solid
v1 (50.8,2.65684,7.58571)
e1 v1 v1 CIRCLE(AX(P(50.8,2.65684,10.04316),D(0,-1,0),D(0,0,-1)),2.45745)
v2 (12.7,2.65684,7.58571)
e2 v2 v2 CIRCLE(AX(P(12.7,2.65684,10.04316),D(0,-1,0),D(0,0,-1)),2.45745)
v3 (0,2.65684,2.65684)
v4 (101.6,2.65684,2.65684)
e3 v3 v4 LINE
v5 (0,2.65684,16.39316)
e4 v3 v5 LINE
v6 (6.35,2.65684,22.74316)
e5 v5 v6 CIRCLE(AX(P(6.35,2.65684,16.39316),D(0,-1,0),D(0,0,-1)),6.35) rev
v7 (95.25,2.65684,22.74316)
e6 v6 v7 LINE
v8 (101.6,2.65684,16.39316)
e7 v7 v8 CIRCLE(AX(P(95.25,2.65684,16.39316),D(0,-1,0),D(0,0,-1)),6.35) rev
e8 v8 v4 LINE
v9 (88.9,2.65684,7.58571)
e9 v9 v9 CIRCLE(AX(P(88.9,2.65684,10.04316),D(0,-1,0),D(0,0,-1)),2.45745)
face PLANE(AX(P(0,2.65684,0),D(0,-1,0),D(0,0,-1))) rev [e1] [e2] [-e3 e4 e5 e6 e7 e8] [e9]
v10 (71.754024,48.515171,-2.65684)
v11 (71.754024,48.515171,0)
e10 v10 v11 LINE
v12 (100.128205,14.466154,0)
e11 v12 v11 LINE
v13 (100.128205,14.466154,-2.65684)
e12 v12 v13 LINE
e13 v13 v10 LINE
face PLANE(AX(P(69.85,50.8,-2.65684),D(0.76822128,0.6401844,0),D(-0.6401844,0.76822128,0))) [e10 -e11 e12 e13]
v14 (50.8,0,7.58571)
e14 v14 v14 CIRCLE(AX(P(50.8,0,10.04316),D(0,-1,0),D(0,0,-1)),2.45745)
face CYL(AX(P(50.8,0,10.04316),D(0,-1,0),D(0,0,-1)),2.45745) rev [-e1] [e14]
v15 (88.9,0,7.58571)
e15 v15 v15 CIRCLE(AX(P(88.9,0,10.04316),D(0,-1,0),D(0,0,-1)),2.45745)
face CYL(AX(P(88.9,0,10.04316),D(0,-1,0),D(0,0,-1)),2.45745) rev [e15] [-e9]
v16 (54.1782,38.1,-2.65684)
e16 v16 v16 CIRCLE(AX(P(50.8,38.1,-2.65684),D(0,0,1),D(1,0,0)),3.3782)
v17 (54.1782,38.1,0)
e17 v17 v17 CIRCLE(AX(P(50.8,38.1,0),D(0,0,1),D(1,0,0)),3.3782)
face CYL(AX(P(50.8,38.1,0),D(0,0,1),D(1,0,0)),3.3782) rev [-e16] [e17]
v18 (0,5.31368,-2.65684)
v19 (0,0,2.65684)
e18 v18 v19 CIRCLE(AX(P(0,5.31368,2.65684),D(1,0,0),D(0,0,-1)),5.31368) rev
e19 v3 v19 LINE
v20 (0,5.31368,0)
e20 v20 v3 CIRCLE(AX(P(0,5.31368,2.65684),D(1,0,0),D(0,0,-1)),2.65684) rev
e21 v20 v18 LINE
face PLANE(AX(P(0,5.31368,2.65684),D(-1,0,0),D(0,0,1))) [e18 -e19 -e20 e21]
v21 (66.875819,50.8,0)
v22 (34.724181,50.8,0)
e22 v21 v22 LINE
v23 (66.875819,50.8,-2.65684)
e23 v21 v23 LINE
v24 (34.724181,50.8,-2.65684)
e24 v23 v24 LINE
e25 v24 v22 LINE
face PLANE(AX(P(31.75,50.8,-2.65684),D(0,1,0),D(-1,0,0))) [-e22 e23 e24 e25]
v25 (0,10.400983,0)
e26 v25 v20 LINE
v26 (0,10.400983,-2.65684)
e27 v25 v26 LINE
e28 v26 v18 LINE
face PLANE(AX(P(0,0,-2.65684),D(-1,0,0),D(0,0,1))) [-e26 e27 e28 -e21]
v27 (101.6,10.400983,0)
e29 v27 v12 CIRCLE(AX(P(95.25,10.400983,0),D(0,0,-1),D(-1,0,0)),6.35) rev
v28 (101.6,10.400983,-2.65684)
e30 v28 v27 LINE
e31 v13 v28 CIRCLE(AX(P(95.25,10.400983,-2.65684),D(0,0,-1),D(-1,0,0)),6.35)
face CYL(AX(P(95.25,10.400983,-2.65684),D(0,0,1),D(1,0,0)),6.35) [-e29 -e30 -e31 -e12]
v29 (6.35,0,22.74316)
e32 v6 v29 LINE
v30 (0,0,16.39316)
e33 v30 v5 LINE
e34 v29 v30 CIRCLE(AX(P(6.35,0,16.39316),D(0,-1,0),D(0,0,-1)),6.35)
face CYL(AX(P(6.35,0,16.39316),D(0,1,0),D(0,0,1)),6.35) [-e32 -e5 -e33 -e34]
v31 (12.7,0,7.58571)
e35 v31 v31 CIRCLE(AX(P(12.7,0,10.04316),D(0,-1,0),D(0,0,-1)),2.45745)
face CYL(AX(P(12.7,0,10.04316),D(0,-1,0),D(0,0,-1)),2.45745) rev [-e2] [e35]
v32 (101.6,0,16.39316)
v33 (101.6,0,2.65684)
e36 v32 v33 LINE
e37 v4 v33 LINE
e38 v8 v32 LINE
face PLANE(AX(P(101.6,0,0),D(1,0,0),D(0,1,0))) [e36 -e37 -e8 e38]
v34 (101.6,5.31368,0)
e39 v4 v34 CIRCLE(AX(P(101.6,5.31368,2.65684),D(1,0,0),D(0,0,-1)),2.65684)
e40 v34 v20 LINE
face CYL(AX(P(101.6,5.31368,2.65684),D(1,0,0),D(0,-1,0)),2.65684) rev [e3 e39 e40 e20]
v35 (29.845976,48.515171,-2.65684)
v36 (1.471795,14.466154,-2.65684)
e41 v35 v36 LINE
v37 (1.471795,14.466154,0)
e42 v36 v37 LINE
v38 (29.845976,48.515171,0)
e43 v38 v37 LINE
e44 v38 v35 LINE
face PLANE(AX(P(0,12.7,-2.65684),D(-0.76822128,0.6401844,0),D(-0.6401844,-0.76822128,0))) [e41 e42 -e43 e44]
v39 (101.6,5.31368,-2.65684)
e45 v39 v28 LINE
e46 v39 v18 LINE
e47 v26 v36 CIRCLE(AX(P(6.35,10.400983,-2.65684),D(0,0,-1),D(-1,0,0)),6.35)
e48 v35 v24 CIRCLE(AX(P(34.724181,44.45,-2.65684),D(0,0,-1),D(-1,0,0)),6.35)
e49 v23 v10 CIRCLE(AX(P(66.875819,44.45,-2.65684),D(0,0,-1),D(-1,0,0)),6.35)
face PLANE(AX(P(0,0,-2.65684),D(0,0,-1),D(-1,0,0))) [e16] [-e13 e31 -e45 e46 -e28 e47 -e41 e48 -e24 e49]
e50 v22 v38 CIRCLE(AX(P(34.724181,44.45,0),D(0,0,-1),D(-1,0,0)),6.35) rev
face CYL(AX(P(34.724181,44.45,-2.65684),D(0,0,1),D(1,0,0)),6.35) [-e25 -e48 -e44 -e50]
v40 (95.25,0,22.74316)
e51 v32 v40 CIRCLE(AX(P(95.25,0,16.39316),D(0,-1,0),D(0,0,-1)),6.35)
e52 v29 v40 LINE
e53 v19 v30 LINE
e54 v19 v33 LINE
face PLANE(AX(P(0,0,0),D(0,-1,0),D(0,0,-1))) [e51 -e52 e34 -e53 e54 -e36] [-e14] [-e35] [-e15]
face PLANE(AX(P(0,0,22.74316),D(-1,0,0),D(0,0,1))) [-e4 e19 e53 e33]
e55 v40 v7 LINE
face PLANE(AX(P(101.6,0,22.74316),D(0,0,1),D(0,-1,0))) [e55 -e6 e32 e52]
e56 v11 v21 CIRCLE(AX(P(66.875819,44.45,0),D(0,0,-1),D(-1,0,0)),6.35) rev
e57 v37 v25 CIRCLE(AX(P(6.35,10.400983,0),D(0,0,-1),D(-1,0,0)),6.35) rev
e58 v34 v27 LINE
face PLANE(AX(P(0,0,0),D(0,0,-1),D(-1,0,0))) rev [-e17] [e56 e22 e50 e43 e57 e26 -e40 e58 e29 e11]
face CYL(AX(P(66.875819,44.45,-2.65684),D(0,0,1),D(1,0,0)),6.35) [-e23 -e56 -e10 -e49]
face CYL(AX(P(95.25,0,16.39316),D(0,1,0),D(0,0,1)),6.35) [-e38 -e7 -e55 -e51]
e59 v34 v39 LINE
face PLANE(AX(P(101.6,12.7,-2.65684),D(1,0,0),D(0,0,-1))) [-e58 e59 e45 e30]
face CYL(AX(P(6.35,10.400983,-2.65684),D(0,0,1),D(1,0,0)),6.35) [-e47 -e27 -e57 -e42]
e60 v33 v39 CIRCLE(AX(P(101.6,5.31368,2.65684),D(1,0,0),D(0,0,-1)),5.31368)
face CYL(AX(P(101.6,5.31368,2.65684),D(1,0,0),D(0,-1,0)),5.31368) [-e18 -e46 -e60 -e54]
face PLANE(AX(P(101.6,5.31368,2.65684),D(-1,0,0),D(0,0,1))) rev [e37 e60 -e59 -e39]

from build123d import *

# Parameters (mm, degrees)
BASE_FLANGE1_DEPTH           = 2.65684
EDGE_FLANGE1_STRIP_W         = 15.94104
EDGE_FLANGE1_STRIP_H         = 2.65684
EDGE_FLANGE1_STRIP_CUT_DEPTH = 101.6
EDGE_FLANGE1_DEPTH           = 101.6
FILLET1_R                    = 6.35
F_10_0_1935_DIAMETER_HOLE1_D = 4.9149
F_1_4_CLEARANCE_HOLE1_D      = 6.7564


# Sheet-metal steps are written as plain solids
with BuildPart() as part:
    # Sketch1 → Base-Flange1 (new body)
    with BuildSketch(Plane.XY):
        Polygon((0, 0), (0, 12.7), (31.75, 50.8), (69.85, 50.8), (101.6, 12.7), (101.6, 0), align=None)
    extrude(amount=-BASE_FLANGE1_DEPTH)

    # Edge-Flange1 strip (across the edge) → Edge-Flange1 strip cut (cut)
    with BuildSketch(Plane.YZ):
        with Locations((-2.65684, -1.32842)):
            Rectangle(EDGE_FLANGE1_STRIP_W, EDGE_FLANGE1_STRIP_H)
    extrude(amount=EDGE_FLANGE1_STRIP_CUT_DEPTH, mode=Mode.SUBTRACT)

    # Edge-Flange1 section (across the edge) → Edge-Flange1 (add)
    with BuildSketch(Plane.YZ):
        with BuildLine():
            Line((0, 2.65684), (0, 22.74316))
            Line((0, 22.74316), (2.65684, 22.74316))
            Line((2.65684, 22.74316), (2.65684, 2.65684))
            ThreePointArc((2.65684, 2.65684), (3.435010419, 0.778170419), (5.31368, 0))
            Line((5.31368, 0), (5.31368, -2.65684))
            ThreePointArc((5.31368, -2.65684), (1.556340839, -1.100499161), (0, 2.65684))
        make_face()
    extrude(amount=EDGE_FLANGE1_DEPTH)

    # Fillet1
    fillet1_edges = [part.edges().sort_by_distance(p)[0] for p in [
        (0, 12.7, -1.32842),
        (31.75, 50.8, -1.32842),
        (69.85, 50.8, -1.32842),
        (101.6, 12.7, -1.32842),
        (0, 1.32842, 22.74316),
        (101.6, 1.32842, 22.74316),
    ]]
    fillet(fillet1_edges, radius=FILLET1_R)

    # #10 (0.1935) Diameter Hole1 (through all)
    with Locations(Plane(origin=(0, 0, 0), x_dir=(-1, 0, 0), z_dir=(0, -1, 0))):
        with Locations((-88.9, -10.04316), (-50.8, -10.04316), (-12.7, -10.04316)):
            Hole(F_10_0_1935_DIAMETER_HOLE1_D / 2)

    # 1/4 Clearance Hole1 (through all)
    with Locations(Plane.XY):
        with Locations((50.8, 38.1)):
            Hole(F_1_4_CLEARANCE_HOLE1_D / 2)


solid = part.part
